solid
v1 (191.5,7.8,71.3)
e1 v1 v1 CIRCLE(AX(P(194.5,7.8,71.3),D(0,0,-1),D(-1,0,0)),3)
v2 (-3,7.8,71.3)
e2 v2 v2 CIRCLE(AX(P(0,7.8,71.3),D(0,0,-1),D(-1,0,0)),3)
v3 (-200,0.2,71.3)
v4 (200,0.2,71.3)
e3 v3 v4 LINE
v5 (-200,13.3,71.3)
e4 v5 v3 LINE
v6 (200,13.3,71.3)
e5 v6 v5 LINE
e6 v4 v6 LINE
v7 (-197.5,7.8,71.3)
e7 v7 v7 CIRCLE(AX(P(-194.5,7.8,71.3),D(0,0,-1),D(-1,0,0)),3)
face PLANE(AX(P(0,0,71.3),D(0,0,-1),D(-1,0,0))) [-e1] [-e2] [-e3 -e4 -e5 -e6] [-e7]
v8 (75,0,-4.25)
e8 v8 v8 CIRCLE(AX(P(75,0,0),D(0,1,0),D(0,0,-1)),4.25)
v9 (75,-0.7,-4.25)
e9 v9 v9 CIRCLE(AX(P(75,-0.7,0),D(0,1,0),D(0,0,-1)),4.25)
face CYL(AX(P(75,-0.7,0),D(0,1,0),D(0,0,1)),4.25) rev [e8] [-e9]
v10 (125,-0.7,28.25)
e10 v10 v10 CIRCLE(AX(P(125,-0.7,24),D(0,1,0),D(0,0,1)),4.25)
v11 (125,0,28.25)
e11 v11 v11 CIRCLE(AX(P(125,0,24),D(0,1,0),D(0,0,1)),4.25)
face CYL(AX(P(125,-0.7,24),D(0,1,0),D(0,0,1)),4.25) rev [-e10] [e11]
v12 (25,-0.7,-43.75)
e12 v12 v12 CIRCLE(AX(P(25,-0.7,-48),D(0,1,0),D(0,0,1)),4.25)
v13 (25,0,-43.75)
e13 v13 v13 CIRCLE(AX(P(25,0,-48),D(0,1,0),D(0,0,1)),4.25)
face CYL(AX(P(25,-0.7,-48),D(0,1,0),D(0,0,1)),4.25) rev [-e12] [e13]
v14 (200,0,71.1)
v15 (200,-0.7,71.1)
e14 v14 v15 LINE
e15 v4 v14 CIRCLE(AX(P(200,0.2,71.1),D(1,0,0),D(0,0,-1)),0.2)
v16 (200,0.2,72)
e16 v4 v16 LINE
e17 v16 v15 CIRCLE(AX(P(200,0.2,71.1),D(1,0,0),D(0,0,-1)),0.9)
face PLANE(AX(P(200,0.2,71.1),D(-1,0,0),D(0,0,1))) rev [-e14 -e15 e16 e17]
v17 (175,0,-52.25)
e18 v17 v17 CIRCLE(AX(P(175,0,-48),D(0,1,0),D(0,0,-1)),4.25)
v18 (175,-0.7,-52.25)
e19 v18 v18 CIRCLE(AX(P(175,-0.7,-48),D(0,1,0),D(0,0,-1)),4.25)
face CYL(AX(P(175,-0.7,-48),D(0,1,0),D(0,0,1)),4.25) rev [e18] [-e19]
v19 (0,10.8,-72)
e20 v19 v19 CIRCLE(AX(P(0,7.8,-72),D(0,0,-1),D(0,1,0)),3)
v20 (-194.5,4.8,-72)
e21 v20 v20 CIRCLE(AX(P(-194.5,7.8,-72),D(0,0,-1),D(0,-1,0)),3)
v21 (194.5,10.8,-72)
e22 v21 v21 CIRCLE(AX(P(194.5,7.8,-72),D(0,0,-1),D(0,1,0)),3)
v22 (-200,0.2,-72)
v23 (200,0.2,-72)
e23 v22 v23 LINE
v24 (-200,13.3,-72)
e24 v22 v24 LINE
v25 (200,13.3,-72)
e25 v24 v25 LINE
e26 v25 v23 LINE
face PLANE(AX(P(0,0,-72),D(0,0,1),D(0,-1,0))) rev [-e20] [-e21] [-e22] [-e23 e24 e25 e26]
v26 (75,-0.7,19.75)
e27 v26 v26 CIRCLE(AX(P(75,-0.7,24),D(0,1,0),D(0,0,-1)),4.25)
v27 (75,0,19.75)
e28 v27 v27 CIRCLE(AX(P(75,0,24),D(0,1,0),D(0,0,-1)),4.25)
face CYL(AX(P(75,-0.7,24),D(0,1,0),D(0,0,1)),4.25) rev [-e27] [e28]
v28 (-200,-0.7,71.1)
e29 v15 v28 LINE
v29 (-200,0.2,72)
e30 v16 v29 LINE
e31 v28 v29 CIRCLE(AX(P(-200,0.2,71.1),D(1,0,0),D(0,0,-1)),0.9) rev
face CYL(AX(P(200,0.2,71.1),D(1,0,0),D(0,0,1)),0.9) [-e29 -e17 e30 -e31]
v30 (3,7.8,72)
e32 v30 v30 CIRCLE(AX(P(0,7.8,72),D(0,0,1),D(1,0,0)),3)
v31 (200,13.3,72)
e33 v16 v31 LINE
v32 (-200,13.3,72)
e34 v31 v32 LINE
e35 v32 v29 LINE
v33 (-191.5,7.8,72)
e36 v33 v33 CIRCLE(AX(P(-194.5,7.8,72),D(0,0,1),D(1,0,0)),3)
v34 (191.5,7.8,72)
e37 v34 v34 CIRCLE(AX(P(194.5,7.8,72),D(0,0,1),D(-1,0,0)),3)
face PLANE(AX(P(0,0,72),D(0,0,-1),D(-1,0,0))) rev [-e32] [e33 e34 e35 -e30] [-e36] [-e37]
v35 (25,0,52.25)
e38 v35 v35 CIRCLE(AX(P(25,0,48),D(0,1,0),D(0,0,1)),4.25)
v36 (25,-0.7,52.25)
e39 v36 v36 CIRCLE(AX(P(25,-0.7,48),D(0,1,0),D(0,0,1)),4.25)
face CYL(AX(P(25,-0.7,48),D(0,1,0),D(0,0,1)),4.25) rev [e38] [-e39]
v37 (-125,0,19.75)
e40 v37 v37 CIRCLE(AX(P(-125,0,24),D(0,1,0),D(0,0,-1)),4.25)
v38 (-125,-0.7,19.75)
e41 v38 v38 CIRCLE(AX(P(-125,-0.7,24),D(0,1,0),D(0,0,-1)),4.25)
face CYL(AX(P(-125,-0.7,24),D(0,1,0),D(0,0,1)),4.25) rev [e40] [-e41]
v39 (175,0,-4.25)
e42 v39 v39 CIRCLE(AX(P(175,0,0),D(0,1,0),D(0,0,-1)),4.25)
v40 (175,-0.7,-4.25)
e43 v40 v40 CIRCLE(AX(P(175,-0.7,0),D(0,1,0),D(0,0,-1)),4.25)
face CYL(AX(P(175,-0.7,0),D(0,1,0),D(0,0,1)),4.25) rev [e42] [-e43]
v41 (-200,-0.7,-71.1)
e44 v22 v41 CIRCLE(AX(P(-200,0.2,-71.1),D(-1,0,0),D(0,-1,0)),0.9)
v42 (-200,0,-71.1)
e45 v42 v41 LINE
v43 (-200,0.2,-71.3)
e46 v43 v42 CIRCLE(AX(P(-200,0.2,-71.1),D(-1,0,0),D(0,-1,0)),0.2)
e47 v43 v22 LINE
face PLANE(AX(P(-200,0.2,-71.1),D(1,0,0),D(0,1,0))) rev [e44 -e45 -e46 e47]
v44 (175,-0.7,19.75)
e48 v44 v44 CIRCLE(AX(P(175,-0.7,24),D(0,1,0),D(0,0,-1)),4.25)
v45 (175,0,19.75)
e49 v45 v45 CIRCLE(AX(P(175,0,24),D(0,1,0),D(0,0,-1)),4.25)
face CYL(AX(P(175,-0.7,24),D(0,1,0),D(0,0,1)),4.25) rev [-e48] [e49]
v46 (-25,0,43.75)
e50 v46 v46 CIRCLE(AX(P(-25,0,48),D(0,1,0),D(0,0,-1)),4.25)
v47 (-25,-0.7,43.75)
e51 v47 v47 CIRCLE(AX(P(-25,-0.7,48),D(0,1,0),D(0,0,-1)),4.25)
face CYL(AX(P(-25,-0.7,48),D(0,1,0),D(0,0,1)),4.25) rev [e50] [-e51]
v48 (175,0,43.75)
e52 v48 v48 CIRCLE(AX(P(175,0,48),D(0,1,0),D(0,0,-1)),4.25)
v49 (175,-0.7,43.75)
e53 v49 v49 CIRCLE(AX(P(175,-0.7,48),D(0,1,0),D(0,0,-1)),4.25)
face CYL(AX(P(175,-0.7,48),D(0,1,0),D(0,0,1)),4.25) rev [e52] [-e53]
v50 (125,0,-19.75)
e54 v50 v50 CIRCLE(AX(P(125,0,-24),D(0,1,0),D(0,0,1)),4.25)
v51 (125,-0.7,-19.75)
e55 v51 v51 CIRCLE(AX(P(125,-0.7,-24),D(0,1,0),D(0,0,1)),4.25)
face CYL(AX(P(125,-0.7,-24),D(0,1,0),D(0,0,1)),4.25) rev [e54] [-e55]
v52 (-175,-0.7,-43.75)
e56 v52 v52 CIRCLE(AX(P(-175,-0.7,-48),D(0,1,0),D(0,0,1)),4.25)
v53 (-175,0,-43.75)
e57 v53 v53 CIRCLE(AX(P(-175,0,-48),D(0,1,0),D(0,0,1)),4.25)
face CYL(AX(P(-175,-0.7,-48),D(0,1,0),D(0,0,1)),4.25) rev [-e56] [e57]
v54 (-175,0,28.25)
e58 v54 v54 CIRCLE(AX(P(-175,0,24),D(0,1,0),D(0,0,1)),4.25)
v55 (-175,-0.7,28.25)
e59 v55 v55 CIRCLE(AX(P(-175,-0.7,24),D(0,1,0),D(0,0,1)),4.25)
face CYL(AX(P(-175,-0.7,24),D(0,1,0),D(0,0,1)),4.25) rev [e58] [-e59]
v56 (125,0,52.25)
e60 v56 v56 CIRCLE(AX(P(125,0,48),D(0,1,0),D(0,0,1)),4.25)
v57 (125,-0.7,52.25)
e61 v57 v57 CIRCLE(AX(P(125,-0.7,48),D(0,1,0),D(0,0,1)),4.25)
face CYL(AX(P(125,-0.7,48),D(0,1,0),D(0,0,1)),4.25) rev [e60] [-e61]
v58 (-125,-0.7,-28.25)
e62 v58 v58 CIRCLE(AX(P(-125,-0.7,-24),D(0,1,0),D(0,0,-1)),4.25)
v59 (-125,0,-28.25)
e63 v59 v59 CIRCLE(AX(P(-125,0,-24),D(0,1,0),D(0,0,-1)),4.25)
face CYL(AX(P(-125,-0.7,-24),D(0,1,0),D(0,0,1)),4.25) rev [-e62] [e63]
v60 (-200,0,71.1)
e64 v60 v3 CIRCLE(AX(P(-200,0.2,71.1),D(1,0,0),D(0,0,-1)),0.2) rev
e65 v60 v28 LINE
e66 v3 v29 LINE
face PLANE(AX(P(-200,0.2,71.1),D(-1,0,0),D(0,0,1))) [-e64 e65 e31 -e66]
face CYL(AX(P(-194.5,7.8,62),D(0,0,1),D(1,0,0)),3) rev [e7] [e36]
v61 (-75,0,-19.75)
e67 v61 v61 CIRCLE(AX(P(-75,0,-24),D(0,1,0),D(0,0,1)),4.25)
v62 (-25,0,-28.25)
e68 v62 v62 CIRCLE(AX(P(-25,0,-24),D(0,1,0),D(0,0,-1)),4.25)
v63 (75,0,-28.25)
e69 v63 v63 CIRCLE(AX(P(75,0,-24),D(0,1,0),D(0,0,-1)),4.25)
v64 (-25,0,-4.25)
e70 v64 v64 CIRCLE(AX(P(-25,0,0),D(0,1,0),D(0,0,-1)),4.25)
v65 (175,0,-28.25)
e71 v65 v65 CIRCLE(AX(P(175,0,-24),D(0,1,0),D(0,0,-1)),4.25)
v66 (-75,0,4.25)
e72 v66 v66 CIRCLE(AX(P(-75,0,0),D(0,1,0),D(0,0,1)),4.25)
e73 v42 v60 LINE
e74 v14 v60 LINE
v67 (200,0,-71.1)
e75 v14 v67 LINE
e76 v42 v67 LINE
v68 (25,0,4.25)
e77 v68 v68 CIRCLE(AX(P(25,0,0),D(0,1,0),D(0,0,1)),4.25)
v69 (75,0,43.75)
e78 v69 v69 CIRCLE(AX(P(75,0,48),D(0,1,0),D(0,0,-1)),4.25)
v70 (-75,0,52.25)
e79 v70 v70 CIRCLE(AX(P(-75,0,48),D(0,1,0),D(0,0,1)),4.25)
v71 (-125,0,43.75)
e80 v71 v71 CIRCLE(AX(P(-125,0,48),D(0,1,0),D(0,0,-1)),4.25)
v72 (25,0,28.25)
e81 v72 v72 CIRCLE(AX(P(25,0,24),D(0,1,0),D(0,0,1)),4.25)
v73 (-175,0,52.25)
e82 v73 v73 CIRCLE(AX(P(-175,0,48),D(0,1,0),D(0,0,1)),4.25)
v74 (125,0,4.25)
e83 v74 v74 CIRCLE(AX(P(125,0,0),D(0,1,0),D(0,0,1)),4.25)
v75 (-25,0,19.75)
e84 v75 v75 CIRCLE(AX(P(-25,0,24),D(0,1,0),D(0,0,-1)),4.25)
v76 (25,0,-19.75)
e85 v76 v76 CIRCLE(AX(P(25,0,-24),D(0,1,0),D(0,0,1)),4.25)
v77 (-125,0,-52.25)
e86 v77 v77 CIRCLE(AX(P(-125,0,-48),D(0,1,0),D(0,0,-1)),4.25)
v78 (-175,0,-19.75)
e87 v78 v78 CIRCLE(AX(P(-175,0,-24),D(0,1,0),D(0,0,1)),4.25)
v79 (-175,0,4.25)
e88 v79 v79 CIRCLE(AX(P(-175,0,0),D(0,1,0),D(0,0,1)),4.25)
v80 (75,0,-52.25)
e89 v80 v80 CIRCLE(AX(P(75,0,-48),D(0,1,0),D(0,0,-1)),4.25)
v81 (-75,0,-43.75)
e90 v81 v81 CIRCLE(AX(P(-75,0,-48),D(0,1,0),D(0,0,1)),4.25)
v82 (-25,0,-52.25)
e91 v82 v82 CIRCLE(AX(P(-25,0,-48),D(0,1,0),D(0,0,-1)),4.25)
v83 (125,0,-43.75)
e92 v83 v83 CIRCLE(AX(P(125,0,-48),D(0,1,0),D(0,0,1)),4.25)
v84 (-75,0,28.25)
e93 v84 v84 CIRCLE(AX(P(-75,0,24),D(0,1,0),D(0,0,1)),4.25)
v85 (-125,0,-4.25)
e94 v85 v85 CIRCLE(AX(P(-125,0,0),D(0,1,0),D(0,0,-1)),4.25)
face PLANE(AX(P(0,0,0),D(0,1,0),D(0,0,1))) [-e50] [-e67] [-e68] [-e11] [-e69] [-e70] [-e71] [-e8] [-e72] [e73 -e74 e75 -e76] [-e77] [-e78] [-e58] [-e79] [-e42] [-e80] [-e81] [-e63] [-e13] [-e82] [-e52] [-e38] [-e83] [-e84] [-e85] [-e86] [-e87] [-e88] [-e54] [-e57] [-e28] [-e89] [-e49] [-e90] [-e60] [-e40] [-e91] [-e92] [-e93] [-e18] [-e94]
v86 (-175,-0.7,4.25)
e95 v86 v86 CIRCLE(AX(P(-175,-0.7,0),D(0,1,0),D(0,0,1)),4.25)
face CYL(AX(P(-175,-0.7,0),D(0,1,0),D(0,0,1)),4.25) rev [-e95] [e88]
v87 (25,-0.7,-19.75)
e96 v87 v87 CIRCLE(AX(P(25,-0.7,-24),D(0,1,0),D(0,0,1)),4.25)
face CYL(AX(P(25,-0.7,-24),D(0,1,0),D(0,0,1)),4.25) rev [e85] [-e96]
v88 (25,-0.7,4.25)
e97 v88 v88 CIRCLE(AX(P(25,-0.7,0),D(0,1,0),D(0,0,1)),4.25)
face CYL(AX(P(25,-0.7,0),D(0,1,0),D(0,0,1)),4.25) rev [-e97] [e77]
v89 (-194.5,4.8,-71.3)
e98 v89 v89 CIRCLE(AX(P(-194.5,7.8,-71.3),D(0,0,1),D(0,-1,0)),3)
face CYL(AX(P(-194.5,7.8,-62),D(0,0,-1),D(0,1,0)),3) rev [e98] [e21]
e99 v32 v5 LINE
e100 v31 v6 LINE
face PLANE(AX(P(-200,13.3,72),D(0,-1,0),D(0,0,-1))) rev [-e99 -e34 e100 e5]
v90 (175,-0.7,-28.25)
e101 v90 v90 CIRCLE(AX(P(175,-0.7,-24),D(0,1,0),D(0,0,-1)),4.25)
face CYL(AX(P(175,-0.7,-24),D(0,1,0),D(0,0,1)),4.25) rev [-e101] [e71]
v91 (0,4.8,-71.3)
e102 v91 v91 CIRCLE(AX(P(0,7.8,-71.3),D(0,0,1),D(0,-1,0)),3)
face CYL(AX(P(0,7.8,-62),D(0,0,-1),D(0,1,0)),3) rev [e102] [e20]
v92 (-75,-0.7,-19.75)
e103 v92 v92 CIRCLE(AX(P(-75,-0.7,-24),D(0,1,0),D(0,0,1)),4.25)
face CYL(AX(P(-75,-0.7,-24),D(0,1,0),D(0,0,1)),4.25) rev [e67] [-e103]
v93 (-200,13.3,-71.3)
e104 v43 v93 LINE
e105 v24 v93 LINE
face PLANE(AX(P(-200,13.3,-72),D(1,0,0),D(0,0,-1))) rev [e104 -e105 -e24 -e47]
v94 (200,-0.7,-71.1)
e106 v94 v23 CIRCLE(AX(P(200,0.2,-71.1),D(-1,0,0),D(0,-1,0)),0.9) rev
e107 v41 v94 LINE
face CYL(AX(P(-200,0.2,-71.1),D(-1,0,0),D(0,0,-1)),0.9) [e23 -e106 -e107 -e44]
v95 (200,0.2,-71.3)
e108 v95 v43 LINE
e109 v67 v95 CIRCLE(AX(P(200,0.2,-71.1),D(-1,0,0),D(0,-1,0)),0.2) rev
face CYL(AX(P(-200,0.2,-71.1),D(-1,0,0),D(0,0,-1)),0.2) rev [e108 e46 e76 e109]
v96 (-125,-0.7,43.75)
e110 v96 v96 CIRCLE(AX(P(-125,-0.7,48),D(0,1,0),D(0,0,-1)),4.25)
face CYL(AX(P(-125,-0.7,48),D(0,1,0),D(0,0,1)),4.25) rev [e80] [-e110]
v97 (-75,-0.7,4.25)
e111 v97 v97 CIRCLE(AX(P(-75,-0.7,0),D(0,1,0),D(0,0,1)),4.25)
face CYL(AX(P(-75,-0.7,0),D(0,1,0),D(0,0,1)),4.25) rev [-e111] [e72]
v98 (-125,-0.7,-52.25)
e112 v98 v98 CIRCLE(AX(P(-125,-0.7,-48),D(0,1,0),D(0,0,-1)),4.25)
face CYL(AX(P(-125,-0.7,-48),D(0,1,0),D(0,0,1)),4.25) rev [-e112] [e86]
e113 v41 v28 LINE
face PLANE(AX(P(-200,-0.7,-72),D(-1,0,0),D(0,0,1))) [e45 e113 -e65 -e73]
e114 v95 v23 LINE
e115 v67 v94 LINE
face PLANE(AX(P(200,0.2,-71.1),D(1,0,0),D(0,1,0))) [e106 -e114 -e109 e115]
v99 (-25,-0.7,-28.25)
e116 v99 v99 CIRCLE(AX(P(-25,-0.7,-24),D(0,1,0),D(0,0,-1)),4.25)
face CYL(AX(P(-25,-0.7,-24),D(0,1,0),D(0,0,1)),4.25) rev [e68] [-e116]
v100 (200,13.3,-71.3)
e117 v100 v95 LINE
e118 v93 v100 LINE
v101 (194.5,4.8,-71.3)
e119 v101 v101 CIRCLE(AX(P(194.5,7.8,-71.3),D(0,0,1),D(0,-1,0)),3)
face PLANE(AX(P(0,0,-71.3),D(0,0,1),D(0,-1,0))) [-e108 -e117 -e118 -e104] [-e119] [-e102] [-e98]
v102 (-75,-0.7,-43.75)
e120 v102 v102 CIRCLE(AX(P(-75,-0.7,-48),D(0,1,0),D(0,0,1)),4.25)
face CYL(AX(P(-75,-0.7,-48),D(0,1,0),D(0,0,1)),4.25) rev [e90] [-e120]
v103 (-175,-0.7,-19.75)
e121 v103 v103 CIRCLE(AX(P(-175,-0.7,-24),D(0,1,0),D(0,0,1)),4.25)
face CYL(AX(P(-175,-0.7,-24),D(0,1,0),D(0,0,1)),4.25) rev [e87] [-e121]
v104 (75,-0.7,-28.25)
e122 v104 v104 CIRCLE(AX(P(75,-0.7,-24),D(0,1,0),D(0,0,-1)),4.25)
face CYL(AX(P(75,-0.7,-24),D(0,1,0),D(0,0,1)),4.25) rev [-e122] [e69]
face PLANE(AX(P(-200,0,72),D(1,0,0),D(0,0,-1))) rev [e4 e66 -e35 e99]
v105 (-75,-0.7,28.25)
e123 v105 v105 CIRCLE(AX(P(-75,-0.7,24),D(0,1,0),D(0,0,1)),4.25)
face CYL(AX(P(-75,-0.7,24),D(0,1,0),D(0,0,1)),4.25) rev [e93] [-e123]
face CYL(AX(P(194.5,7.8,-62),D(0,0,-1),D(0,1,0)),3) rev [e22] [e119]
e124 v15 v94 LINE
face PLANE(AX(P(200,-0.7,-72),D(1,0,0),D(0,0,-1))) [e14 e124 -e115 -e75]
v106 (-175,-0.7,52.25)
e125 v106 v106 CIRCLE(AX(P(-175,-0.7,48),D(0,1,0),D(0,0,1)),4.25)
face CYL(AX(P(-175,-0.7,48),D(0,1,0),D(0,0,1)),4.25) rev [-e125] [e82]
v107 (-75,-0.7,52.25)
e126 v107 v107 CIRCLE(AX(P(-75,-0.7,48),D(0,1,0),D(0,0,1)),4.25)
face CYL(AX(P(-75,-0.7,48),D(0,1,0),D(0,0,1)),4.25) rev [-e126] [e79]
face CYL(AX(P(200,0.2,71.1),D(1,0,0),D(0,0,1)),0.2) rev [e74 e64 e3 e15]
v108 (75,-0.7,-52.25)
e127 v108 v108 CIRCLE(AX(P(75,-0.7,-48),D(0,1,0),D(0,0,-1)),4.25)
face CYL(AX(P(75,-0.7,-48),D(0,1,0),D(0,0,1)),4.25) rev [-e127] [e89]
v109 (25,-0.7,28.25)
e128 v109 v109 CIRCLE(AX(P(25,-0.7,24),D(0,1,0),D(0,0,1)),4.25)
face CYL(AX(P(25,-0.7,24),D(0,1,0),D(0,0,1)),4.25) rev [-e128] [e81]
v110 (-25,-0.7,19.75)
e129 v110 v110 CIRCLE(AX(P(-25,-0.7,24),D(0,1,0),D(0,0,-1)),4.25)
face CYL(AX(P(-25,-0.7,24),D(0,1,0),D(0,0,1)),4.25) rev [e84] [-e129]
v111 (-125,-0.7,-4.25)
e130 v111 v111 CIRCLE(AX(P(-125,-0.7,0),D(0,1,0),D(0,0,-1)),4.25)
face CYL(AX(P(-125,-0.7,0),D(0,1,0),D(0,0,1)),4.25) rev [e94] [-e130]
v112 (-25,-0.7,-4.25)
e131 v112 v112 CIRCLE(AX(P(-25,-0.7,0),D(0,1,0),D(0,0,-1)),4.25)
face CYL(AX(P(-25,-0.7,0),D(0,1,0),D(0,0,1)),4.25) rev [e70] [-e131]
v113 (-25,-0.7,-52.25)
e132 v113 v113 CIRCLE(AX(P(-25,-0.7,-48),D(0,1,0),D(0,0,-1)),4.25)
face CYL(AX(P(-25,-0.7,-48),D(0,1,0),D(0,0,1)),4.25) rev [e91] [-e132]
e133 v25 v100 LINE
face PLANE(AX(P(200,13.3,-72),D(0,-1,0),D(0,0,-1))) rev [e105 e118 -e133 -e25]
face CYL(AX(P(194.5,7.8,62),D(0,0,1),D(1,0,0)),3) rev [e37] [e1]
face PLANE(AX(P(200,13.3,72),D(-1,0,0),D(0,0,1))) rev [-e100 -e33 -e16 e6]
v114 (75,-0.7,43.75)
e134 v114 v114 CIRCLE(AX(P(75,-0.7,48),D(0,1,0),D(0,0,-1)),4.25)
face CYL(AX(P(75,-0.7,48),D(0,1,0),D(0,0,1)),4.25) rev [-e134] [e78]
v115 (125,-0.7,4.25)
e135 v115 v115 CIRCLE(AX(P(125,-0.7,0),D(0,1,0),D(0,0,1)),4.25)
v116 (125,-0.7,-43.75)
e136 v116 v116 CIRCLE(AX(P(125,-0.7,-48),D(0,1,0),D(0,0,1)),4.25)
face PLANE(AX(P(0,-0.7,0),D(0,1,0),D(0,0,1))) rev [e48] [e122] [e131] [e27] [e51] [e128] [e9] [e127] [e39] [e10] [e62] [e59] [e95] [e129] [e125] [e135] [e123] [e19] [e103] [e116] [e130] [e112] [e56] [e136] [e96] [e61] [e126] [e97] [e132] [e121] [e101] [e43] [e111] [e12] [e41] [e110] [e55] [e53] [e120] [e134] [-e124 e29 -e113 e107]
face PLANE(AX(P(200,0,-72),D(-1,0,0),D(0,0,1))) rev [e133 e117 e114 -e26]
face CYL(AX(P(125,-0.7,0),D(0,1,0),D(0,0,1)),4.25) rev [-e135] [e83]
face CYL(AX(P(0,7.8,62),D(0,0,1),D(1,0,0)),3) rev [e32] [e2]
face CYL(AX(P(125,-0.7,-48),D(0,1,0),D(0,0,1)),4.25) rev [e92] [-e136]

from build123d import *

# Parameters (mm, degrees)
SKETCH_1_W                         = 400
SKETCH_1_H                         = 144
SKETCH_1_R                         = 4.25
SM_BASE_FLANGE_1_DEPTH             = 0.7
SM_EDGE_FLANGE_1_STRIP_W           = 3.2
SM_EDGE_FLANGE_1_STRIP_H           = 0.7
SM_EDGE_FLANGE_1_STRIP_CUT_DEPTH   = 400
SM_EDGE_FLANGE_1_STRIP_2_W         = 3.2
SM_EDGE_FLANGE_1_STRIP_2_H         = 0.7
SM_EDGE_FLANGE_1_STRIP_CUT_2_DEPTH = 400
SM_EDGE_FLANGE_1_DEPTH             = 400
SM_EDGE_FLANGE_1_BEND_DEPTH        = 400
SKETCH_14_R                        = 3
CUT_EXTRUDE_1_DEPTH                = 10
CUT_EXTRUDE_START                  = -10
SKETCH_15_R                        = 3
CUT_EXTRUDE_2_DEPTH                = 10


# Sheet-metal steps are written as plain solids
with BuildPart() as part:
    # Sketch 1 → 基体-法兰1 (new body)
    with BuildSketch(Plane(origin=(0, 0, 0), x_dir=(1, 0, 0), z_dir=(0, 1, 0))):
        Rectangle(SKETCH_1_W, SKETCH_1_H)
        with Locations(Location((-175, -48, 0), (0, 0, 270))):
            Circle(SKETCH_1_R, mode=Mode.SUBTRACT)
        with Locations(Location((-175, -24, 0), (0, 0, 270))):
            Circle(SKETCH_1_R, mode=Mode.SUBTRACT)
        with Locations(Location((-175, 0, 0), (0, 0, 270))):
            Circle(SKETCH_1_R, mode=Mode.SUBTRACT)
        with Locations(Location((-175, 24, 0), (0, 0, 270))):
            Circle(SKETCH_1_R, mode=Mode.SUBTRACT)
        with Locations(Location((-175, 48, 0), (0, 0, 270))):
            Circle(SKETCH_1_R, mode=Mode.SUBTRACT)
        with Locations(Location((-125, -48, 0), (0, 0, 90))):
            Circle(SKETCH_1_R, mode=Mode.SUBTRACT)
        with Locations(Location((-125, -24, 0), (0, 0, 90))):
            Circle(SKETCH_1_R, mode=Mode.SUBTRACT)
        with Locations(Location((-125, 0, 0), (0, 0, 90))):
            Circle(SKETCH_1_R, mode=Mode.SUBTRACT)
        with Locations(Location((-125, 24, 0), (0, 0, 90))):
            Circle(SKETCH_1_R, mode=Mode.SUBTRACT)
        with Locations(Location((-125, 48, 0), (0, 0, 90))):
            Circle(SKETCH_1_R, mode=Mode.SUBTRACT)
        with Locations(Location((-75, -48, 0), (0, 0, 270))):
            Circle(SKETCH_1_R, mode=Mode.SUBTRACT)
        with Locations(Location((-25, -48, 0), (0, 0, 90))):
            Circle(SKETCH_1_R, mode=Mode.SUBTRACT)
        with Locations(Location((-25, -24, 0), (0, 0, 90))):
            Circle(SKETCH_1_R, mode=Mode.SUBTRACT)
        with Locations(Location((-75, -24, 0), (0, 0, 270))):
            Circle(SKETCH_1_R, mode=Mode.SUBTRACT)
        with Locations(Location((-75, 0, 0), (0, 0, 270))):
            Circle(SKETCH_1_R, mode=Mode.SUBTRACT)
        with Locations(Location((-25, 0, 0), (0, 0, 90))):
            Circle(SKETCH_1_R, mode=Mode.SUBTRACT)
        with Locations(Location((-75, 24, 0), (0, 0, 270))):
            Circle(SKETCH_1_R, mode=Mode.SUBTRACT)
        with Locations(Location((-25, 24, 0), (0, 0, 90))):
            Circle(SKETCH_1_R, mode=Mode.SUBTRACT)
        with Locations(Location((-25, 48, 0), (0, 0, 90))):
            Circle(SKETCH_1_R, mode=Mode.SUBTRACT)
        with Locations(Location((-75, 48, 0), (0, 0, 270))):
            Circle(SKETCH_1_R, mode=Mode.SUBTRACT)
        with Locations(Location((25, 48, 0), (0, 0, 270))):
            Circle(SKETCH_1_R, mode=Mode.SUBTRACT)
        with Locations(Location((25, 24, 0), (0, 0, 270))):
            Circle(SKETCH_1_R, mode=Mode.SUBTRACT)
        with Locations(Location((25, 0, 0), (0, 0, 270))):
            Circle(SKETCH_1_R, mode=Mode.SUBTRACT)
        with Locations(Location((25, -24, 0), (0, 0, 270))):
            Circle(SKETCH_1_R, mode=Mode.SUBTRACT)
        with Locations(Location((25, -48, 0), (0, 0, 270))):
            Circle(SKETCH_1_R, mode=Mode.SUBTRACT)
        with Locations(Location((75, -48, 0), (0, 0, 90))):
            Circle(SKETCH_1_R, mode=Mode.SUBTRACT)
        with Locations(Location((75, -24, 0), (0, 0, 90))):
            Circle(SKETCH_1_R, mode=Mode.SUBTRACT)
        with Locations(Location((75, 0, 0), (0, 0, 90))):
            Circle(SKETCH_1_R, mode=Mode.SUBTRACT)
        with Locations(Location((75, 24, 0), (0, 0, 90))):
            Circle(SKETCH_1_R, mode=Mode.SUBTRACT)
        with Locations(Location((75, 48, 0), (0, 0, 90))):
            Circle(SKETCH_1_R, mode=Mode.SUBTRACT)
        with Locations(Location((125, 48, 0), (0, 0, 270))):
            Circle(SKETCH_1_R, mode=Mode.SUBTRACT)
        with Locations(Location((125, 24, 0), (0, 0, 270))):
            Circle(SKETCH_1_R, mode=Mode.SUBTRACT)
        with Locations(Location((125, 0, 0), (0, 0, 270))):
            Circle(SKETCH_1_R, mode=Mode.SUBTRACT)
        with Locations(Location((125, -24, 0), (0, 0, 270))):
            Circle(SKETCH_1_R, mode=Mode.SUBTRACT)
        with Locations(Location((125, -48, 0), (0, 0, 270))):
            Circle(SKETCH_1_R, mode=Mode.SUBTRACT)
        with Locations(Location((175, -48, 0), (0, 0, 90))):
            Circle(SKETCH_1_R, mode=Mode.SUBTRACT)
        with Locations(Location((175, -24, 0), (0, 0, 90))):
            Circle(SKETCH_1_R, mode=Mode.SUBTRACT)
        with Locations(Location((175, 0, 0), (0, 0, 90))):
            Circle(SKETCH_1_R, mode=Mode.SUBTRACT)
        with Locations(Location((175, 24, 0), (0, 0, 90))):
            Circle(SKETCH_1_R, mode=Mode.SUBTRACT)
        with Locations(Location((175, 48, 0), (0, 0, 90))):
            Circle(SKETCH_1_R, mode=Mode.SUBTRACT)
    extrude(amount=-SM_BASE_FLANGE_1_DEPTH)

    # 边线-法兰1 strip (across the edge) → 边线-法兰1 strip cut (cut)
    with BuildSketch(Plane(origin=(-200, 0, 72), x_dir=(0, 0, -1), z_dir=(1, 0, 0))):
        with Locations((-0.7, -0.35)):
            Rectangle(SM_EDGE_FLANGE_1_STRIP_W, SM_EDGE_FLANGE_1_STRIP_H)
    extrude(amount=SM_EDGE_FLANGE_1_STRIP_CUT_DEPTH, mode=Mode.SUBTRACT)

    # 边线-法兰1 strip 2 (across the edge) → 边线-法兰1 strip cut 2 (cut)
    with BuildSketch(Plane(origin=(200, 0, -72), x_dir=(0, 0, 1), z_dir=(-1, 0, 0))):
        with Locations((-0.7, -0.35)):
            Rectangle(SM_EDGE_FLANGE_1_STRIP_2_W, SM_EDGE_FLANGE_1_STRIP_2_H)
    extrude(amount=SM_EDGE_FLANGE_1_STRIP_CUT_2_DEPTH, mode=Mode.SUBTRACT)

    # 边线-法兰1 section (across the edge) → 边线-法兰1 (add)
    with BuildSketch(Plane(origin=(-200, 0, 72), x_dir=(0, 0, -1), z_dir=(1, 0, 0))):
        with BuildLine():
            Line((0, 0.2), (0, 13.3))
            Line((0, 13.3), (0.7, 13.3))
            Line((0.7, 13.3), (0.7, 0.2))
            ThreePointArc((0.7, 0.2), (0.758578644, 0.058578644), (0.9, 0))
            Line((0.9, 0), (0.9, -0.7))
            ThreePointArc((0.9, -0.7), (0.263603897, -0.436396103), (0, 0.2))
        make_face()
    extrude(amount=SM_EDGE_FLANGE_1_DEPTH)

    # 边线-法兰1 section 2 (across the edge) → 边线-法兰1 bend (add)
    with BuildSketch(Plane(origin=(200, 0, -72), x_dir=(0, 0, 1), z_dir=(-1, 0, 0))):
        with BuildLine():
            Line((0, 0.2), (0, 13.3))
            Line((0, 13.3), (0.7, 13.3))
            Line((0.7, 13.3), (0.7, 0.2))
            ThreePointArc((0.7, 0.2), (0.758578644, 0.058578644), (0.9, 0))
            Line((0.9, 0), (0.9, -0.7))
            ThreePointArc((0.9, -0.7), (0.263603897, -0.436396103), (0, 0.2))
        make_face()
    extrude(amount=SM_EDGE_FLANGE_1_BEND_DEPTH)

    # 草图14 → 切除-拉伸1 (cut)
    with BuildSketch(Plane.XY.offset(72)):
        with Locations((-194.5, 7.8)):
            Circle(SKETCH_14_R)
        with Locations((0, 7.8)):
            Circle(SKETCH_14_R)
        with Locations(Location((194.5, 7.8, 0), (0, 0, 180))):
            Circle(SKETCH_14_R)
    extrude(amount=-CUT_EXTRUDE_1_DEPTH, mode=Mode.SUBTRACT)

    # 草图15 → 切除-拉伸2 (cut)
    with BuildSketch(Plane(origin=(0, 0, -72), x_dir=(-1, 0, 0), z_dir=(0, 0, -1)).offset(CUT_EXTRUDE_START)):
        with Locations((-194.5, 7.8)):
            Circle(SKETCH_15_R)
        with Locations(Location((0, 7.8, 0), (0, 0, 180))):
            Circle(SKETCH_15_R)
        with Locations(Location((194.5, 7.8, 0), (0, 0, 180))):
            Circle(SKETCH_15_R)
    extrude(amount=CUT_EXTRUDE_2_DEPTH, mode=Mode.SUBTRACT)


solid = part.part
